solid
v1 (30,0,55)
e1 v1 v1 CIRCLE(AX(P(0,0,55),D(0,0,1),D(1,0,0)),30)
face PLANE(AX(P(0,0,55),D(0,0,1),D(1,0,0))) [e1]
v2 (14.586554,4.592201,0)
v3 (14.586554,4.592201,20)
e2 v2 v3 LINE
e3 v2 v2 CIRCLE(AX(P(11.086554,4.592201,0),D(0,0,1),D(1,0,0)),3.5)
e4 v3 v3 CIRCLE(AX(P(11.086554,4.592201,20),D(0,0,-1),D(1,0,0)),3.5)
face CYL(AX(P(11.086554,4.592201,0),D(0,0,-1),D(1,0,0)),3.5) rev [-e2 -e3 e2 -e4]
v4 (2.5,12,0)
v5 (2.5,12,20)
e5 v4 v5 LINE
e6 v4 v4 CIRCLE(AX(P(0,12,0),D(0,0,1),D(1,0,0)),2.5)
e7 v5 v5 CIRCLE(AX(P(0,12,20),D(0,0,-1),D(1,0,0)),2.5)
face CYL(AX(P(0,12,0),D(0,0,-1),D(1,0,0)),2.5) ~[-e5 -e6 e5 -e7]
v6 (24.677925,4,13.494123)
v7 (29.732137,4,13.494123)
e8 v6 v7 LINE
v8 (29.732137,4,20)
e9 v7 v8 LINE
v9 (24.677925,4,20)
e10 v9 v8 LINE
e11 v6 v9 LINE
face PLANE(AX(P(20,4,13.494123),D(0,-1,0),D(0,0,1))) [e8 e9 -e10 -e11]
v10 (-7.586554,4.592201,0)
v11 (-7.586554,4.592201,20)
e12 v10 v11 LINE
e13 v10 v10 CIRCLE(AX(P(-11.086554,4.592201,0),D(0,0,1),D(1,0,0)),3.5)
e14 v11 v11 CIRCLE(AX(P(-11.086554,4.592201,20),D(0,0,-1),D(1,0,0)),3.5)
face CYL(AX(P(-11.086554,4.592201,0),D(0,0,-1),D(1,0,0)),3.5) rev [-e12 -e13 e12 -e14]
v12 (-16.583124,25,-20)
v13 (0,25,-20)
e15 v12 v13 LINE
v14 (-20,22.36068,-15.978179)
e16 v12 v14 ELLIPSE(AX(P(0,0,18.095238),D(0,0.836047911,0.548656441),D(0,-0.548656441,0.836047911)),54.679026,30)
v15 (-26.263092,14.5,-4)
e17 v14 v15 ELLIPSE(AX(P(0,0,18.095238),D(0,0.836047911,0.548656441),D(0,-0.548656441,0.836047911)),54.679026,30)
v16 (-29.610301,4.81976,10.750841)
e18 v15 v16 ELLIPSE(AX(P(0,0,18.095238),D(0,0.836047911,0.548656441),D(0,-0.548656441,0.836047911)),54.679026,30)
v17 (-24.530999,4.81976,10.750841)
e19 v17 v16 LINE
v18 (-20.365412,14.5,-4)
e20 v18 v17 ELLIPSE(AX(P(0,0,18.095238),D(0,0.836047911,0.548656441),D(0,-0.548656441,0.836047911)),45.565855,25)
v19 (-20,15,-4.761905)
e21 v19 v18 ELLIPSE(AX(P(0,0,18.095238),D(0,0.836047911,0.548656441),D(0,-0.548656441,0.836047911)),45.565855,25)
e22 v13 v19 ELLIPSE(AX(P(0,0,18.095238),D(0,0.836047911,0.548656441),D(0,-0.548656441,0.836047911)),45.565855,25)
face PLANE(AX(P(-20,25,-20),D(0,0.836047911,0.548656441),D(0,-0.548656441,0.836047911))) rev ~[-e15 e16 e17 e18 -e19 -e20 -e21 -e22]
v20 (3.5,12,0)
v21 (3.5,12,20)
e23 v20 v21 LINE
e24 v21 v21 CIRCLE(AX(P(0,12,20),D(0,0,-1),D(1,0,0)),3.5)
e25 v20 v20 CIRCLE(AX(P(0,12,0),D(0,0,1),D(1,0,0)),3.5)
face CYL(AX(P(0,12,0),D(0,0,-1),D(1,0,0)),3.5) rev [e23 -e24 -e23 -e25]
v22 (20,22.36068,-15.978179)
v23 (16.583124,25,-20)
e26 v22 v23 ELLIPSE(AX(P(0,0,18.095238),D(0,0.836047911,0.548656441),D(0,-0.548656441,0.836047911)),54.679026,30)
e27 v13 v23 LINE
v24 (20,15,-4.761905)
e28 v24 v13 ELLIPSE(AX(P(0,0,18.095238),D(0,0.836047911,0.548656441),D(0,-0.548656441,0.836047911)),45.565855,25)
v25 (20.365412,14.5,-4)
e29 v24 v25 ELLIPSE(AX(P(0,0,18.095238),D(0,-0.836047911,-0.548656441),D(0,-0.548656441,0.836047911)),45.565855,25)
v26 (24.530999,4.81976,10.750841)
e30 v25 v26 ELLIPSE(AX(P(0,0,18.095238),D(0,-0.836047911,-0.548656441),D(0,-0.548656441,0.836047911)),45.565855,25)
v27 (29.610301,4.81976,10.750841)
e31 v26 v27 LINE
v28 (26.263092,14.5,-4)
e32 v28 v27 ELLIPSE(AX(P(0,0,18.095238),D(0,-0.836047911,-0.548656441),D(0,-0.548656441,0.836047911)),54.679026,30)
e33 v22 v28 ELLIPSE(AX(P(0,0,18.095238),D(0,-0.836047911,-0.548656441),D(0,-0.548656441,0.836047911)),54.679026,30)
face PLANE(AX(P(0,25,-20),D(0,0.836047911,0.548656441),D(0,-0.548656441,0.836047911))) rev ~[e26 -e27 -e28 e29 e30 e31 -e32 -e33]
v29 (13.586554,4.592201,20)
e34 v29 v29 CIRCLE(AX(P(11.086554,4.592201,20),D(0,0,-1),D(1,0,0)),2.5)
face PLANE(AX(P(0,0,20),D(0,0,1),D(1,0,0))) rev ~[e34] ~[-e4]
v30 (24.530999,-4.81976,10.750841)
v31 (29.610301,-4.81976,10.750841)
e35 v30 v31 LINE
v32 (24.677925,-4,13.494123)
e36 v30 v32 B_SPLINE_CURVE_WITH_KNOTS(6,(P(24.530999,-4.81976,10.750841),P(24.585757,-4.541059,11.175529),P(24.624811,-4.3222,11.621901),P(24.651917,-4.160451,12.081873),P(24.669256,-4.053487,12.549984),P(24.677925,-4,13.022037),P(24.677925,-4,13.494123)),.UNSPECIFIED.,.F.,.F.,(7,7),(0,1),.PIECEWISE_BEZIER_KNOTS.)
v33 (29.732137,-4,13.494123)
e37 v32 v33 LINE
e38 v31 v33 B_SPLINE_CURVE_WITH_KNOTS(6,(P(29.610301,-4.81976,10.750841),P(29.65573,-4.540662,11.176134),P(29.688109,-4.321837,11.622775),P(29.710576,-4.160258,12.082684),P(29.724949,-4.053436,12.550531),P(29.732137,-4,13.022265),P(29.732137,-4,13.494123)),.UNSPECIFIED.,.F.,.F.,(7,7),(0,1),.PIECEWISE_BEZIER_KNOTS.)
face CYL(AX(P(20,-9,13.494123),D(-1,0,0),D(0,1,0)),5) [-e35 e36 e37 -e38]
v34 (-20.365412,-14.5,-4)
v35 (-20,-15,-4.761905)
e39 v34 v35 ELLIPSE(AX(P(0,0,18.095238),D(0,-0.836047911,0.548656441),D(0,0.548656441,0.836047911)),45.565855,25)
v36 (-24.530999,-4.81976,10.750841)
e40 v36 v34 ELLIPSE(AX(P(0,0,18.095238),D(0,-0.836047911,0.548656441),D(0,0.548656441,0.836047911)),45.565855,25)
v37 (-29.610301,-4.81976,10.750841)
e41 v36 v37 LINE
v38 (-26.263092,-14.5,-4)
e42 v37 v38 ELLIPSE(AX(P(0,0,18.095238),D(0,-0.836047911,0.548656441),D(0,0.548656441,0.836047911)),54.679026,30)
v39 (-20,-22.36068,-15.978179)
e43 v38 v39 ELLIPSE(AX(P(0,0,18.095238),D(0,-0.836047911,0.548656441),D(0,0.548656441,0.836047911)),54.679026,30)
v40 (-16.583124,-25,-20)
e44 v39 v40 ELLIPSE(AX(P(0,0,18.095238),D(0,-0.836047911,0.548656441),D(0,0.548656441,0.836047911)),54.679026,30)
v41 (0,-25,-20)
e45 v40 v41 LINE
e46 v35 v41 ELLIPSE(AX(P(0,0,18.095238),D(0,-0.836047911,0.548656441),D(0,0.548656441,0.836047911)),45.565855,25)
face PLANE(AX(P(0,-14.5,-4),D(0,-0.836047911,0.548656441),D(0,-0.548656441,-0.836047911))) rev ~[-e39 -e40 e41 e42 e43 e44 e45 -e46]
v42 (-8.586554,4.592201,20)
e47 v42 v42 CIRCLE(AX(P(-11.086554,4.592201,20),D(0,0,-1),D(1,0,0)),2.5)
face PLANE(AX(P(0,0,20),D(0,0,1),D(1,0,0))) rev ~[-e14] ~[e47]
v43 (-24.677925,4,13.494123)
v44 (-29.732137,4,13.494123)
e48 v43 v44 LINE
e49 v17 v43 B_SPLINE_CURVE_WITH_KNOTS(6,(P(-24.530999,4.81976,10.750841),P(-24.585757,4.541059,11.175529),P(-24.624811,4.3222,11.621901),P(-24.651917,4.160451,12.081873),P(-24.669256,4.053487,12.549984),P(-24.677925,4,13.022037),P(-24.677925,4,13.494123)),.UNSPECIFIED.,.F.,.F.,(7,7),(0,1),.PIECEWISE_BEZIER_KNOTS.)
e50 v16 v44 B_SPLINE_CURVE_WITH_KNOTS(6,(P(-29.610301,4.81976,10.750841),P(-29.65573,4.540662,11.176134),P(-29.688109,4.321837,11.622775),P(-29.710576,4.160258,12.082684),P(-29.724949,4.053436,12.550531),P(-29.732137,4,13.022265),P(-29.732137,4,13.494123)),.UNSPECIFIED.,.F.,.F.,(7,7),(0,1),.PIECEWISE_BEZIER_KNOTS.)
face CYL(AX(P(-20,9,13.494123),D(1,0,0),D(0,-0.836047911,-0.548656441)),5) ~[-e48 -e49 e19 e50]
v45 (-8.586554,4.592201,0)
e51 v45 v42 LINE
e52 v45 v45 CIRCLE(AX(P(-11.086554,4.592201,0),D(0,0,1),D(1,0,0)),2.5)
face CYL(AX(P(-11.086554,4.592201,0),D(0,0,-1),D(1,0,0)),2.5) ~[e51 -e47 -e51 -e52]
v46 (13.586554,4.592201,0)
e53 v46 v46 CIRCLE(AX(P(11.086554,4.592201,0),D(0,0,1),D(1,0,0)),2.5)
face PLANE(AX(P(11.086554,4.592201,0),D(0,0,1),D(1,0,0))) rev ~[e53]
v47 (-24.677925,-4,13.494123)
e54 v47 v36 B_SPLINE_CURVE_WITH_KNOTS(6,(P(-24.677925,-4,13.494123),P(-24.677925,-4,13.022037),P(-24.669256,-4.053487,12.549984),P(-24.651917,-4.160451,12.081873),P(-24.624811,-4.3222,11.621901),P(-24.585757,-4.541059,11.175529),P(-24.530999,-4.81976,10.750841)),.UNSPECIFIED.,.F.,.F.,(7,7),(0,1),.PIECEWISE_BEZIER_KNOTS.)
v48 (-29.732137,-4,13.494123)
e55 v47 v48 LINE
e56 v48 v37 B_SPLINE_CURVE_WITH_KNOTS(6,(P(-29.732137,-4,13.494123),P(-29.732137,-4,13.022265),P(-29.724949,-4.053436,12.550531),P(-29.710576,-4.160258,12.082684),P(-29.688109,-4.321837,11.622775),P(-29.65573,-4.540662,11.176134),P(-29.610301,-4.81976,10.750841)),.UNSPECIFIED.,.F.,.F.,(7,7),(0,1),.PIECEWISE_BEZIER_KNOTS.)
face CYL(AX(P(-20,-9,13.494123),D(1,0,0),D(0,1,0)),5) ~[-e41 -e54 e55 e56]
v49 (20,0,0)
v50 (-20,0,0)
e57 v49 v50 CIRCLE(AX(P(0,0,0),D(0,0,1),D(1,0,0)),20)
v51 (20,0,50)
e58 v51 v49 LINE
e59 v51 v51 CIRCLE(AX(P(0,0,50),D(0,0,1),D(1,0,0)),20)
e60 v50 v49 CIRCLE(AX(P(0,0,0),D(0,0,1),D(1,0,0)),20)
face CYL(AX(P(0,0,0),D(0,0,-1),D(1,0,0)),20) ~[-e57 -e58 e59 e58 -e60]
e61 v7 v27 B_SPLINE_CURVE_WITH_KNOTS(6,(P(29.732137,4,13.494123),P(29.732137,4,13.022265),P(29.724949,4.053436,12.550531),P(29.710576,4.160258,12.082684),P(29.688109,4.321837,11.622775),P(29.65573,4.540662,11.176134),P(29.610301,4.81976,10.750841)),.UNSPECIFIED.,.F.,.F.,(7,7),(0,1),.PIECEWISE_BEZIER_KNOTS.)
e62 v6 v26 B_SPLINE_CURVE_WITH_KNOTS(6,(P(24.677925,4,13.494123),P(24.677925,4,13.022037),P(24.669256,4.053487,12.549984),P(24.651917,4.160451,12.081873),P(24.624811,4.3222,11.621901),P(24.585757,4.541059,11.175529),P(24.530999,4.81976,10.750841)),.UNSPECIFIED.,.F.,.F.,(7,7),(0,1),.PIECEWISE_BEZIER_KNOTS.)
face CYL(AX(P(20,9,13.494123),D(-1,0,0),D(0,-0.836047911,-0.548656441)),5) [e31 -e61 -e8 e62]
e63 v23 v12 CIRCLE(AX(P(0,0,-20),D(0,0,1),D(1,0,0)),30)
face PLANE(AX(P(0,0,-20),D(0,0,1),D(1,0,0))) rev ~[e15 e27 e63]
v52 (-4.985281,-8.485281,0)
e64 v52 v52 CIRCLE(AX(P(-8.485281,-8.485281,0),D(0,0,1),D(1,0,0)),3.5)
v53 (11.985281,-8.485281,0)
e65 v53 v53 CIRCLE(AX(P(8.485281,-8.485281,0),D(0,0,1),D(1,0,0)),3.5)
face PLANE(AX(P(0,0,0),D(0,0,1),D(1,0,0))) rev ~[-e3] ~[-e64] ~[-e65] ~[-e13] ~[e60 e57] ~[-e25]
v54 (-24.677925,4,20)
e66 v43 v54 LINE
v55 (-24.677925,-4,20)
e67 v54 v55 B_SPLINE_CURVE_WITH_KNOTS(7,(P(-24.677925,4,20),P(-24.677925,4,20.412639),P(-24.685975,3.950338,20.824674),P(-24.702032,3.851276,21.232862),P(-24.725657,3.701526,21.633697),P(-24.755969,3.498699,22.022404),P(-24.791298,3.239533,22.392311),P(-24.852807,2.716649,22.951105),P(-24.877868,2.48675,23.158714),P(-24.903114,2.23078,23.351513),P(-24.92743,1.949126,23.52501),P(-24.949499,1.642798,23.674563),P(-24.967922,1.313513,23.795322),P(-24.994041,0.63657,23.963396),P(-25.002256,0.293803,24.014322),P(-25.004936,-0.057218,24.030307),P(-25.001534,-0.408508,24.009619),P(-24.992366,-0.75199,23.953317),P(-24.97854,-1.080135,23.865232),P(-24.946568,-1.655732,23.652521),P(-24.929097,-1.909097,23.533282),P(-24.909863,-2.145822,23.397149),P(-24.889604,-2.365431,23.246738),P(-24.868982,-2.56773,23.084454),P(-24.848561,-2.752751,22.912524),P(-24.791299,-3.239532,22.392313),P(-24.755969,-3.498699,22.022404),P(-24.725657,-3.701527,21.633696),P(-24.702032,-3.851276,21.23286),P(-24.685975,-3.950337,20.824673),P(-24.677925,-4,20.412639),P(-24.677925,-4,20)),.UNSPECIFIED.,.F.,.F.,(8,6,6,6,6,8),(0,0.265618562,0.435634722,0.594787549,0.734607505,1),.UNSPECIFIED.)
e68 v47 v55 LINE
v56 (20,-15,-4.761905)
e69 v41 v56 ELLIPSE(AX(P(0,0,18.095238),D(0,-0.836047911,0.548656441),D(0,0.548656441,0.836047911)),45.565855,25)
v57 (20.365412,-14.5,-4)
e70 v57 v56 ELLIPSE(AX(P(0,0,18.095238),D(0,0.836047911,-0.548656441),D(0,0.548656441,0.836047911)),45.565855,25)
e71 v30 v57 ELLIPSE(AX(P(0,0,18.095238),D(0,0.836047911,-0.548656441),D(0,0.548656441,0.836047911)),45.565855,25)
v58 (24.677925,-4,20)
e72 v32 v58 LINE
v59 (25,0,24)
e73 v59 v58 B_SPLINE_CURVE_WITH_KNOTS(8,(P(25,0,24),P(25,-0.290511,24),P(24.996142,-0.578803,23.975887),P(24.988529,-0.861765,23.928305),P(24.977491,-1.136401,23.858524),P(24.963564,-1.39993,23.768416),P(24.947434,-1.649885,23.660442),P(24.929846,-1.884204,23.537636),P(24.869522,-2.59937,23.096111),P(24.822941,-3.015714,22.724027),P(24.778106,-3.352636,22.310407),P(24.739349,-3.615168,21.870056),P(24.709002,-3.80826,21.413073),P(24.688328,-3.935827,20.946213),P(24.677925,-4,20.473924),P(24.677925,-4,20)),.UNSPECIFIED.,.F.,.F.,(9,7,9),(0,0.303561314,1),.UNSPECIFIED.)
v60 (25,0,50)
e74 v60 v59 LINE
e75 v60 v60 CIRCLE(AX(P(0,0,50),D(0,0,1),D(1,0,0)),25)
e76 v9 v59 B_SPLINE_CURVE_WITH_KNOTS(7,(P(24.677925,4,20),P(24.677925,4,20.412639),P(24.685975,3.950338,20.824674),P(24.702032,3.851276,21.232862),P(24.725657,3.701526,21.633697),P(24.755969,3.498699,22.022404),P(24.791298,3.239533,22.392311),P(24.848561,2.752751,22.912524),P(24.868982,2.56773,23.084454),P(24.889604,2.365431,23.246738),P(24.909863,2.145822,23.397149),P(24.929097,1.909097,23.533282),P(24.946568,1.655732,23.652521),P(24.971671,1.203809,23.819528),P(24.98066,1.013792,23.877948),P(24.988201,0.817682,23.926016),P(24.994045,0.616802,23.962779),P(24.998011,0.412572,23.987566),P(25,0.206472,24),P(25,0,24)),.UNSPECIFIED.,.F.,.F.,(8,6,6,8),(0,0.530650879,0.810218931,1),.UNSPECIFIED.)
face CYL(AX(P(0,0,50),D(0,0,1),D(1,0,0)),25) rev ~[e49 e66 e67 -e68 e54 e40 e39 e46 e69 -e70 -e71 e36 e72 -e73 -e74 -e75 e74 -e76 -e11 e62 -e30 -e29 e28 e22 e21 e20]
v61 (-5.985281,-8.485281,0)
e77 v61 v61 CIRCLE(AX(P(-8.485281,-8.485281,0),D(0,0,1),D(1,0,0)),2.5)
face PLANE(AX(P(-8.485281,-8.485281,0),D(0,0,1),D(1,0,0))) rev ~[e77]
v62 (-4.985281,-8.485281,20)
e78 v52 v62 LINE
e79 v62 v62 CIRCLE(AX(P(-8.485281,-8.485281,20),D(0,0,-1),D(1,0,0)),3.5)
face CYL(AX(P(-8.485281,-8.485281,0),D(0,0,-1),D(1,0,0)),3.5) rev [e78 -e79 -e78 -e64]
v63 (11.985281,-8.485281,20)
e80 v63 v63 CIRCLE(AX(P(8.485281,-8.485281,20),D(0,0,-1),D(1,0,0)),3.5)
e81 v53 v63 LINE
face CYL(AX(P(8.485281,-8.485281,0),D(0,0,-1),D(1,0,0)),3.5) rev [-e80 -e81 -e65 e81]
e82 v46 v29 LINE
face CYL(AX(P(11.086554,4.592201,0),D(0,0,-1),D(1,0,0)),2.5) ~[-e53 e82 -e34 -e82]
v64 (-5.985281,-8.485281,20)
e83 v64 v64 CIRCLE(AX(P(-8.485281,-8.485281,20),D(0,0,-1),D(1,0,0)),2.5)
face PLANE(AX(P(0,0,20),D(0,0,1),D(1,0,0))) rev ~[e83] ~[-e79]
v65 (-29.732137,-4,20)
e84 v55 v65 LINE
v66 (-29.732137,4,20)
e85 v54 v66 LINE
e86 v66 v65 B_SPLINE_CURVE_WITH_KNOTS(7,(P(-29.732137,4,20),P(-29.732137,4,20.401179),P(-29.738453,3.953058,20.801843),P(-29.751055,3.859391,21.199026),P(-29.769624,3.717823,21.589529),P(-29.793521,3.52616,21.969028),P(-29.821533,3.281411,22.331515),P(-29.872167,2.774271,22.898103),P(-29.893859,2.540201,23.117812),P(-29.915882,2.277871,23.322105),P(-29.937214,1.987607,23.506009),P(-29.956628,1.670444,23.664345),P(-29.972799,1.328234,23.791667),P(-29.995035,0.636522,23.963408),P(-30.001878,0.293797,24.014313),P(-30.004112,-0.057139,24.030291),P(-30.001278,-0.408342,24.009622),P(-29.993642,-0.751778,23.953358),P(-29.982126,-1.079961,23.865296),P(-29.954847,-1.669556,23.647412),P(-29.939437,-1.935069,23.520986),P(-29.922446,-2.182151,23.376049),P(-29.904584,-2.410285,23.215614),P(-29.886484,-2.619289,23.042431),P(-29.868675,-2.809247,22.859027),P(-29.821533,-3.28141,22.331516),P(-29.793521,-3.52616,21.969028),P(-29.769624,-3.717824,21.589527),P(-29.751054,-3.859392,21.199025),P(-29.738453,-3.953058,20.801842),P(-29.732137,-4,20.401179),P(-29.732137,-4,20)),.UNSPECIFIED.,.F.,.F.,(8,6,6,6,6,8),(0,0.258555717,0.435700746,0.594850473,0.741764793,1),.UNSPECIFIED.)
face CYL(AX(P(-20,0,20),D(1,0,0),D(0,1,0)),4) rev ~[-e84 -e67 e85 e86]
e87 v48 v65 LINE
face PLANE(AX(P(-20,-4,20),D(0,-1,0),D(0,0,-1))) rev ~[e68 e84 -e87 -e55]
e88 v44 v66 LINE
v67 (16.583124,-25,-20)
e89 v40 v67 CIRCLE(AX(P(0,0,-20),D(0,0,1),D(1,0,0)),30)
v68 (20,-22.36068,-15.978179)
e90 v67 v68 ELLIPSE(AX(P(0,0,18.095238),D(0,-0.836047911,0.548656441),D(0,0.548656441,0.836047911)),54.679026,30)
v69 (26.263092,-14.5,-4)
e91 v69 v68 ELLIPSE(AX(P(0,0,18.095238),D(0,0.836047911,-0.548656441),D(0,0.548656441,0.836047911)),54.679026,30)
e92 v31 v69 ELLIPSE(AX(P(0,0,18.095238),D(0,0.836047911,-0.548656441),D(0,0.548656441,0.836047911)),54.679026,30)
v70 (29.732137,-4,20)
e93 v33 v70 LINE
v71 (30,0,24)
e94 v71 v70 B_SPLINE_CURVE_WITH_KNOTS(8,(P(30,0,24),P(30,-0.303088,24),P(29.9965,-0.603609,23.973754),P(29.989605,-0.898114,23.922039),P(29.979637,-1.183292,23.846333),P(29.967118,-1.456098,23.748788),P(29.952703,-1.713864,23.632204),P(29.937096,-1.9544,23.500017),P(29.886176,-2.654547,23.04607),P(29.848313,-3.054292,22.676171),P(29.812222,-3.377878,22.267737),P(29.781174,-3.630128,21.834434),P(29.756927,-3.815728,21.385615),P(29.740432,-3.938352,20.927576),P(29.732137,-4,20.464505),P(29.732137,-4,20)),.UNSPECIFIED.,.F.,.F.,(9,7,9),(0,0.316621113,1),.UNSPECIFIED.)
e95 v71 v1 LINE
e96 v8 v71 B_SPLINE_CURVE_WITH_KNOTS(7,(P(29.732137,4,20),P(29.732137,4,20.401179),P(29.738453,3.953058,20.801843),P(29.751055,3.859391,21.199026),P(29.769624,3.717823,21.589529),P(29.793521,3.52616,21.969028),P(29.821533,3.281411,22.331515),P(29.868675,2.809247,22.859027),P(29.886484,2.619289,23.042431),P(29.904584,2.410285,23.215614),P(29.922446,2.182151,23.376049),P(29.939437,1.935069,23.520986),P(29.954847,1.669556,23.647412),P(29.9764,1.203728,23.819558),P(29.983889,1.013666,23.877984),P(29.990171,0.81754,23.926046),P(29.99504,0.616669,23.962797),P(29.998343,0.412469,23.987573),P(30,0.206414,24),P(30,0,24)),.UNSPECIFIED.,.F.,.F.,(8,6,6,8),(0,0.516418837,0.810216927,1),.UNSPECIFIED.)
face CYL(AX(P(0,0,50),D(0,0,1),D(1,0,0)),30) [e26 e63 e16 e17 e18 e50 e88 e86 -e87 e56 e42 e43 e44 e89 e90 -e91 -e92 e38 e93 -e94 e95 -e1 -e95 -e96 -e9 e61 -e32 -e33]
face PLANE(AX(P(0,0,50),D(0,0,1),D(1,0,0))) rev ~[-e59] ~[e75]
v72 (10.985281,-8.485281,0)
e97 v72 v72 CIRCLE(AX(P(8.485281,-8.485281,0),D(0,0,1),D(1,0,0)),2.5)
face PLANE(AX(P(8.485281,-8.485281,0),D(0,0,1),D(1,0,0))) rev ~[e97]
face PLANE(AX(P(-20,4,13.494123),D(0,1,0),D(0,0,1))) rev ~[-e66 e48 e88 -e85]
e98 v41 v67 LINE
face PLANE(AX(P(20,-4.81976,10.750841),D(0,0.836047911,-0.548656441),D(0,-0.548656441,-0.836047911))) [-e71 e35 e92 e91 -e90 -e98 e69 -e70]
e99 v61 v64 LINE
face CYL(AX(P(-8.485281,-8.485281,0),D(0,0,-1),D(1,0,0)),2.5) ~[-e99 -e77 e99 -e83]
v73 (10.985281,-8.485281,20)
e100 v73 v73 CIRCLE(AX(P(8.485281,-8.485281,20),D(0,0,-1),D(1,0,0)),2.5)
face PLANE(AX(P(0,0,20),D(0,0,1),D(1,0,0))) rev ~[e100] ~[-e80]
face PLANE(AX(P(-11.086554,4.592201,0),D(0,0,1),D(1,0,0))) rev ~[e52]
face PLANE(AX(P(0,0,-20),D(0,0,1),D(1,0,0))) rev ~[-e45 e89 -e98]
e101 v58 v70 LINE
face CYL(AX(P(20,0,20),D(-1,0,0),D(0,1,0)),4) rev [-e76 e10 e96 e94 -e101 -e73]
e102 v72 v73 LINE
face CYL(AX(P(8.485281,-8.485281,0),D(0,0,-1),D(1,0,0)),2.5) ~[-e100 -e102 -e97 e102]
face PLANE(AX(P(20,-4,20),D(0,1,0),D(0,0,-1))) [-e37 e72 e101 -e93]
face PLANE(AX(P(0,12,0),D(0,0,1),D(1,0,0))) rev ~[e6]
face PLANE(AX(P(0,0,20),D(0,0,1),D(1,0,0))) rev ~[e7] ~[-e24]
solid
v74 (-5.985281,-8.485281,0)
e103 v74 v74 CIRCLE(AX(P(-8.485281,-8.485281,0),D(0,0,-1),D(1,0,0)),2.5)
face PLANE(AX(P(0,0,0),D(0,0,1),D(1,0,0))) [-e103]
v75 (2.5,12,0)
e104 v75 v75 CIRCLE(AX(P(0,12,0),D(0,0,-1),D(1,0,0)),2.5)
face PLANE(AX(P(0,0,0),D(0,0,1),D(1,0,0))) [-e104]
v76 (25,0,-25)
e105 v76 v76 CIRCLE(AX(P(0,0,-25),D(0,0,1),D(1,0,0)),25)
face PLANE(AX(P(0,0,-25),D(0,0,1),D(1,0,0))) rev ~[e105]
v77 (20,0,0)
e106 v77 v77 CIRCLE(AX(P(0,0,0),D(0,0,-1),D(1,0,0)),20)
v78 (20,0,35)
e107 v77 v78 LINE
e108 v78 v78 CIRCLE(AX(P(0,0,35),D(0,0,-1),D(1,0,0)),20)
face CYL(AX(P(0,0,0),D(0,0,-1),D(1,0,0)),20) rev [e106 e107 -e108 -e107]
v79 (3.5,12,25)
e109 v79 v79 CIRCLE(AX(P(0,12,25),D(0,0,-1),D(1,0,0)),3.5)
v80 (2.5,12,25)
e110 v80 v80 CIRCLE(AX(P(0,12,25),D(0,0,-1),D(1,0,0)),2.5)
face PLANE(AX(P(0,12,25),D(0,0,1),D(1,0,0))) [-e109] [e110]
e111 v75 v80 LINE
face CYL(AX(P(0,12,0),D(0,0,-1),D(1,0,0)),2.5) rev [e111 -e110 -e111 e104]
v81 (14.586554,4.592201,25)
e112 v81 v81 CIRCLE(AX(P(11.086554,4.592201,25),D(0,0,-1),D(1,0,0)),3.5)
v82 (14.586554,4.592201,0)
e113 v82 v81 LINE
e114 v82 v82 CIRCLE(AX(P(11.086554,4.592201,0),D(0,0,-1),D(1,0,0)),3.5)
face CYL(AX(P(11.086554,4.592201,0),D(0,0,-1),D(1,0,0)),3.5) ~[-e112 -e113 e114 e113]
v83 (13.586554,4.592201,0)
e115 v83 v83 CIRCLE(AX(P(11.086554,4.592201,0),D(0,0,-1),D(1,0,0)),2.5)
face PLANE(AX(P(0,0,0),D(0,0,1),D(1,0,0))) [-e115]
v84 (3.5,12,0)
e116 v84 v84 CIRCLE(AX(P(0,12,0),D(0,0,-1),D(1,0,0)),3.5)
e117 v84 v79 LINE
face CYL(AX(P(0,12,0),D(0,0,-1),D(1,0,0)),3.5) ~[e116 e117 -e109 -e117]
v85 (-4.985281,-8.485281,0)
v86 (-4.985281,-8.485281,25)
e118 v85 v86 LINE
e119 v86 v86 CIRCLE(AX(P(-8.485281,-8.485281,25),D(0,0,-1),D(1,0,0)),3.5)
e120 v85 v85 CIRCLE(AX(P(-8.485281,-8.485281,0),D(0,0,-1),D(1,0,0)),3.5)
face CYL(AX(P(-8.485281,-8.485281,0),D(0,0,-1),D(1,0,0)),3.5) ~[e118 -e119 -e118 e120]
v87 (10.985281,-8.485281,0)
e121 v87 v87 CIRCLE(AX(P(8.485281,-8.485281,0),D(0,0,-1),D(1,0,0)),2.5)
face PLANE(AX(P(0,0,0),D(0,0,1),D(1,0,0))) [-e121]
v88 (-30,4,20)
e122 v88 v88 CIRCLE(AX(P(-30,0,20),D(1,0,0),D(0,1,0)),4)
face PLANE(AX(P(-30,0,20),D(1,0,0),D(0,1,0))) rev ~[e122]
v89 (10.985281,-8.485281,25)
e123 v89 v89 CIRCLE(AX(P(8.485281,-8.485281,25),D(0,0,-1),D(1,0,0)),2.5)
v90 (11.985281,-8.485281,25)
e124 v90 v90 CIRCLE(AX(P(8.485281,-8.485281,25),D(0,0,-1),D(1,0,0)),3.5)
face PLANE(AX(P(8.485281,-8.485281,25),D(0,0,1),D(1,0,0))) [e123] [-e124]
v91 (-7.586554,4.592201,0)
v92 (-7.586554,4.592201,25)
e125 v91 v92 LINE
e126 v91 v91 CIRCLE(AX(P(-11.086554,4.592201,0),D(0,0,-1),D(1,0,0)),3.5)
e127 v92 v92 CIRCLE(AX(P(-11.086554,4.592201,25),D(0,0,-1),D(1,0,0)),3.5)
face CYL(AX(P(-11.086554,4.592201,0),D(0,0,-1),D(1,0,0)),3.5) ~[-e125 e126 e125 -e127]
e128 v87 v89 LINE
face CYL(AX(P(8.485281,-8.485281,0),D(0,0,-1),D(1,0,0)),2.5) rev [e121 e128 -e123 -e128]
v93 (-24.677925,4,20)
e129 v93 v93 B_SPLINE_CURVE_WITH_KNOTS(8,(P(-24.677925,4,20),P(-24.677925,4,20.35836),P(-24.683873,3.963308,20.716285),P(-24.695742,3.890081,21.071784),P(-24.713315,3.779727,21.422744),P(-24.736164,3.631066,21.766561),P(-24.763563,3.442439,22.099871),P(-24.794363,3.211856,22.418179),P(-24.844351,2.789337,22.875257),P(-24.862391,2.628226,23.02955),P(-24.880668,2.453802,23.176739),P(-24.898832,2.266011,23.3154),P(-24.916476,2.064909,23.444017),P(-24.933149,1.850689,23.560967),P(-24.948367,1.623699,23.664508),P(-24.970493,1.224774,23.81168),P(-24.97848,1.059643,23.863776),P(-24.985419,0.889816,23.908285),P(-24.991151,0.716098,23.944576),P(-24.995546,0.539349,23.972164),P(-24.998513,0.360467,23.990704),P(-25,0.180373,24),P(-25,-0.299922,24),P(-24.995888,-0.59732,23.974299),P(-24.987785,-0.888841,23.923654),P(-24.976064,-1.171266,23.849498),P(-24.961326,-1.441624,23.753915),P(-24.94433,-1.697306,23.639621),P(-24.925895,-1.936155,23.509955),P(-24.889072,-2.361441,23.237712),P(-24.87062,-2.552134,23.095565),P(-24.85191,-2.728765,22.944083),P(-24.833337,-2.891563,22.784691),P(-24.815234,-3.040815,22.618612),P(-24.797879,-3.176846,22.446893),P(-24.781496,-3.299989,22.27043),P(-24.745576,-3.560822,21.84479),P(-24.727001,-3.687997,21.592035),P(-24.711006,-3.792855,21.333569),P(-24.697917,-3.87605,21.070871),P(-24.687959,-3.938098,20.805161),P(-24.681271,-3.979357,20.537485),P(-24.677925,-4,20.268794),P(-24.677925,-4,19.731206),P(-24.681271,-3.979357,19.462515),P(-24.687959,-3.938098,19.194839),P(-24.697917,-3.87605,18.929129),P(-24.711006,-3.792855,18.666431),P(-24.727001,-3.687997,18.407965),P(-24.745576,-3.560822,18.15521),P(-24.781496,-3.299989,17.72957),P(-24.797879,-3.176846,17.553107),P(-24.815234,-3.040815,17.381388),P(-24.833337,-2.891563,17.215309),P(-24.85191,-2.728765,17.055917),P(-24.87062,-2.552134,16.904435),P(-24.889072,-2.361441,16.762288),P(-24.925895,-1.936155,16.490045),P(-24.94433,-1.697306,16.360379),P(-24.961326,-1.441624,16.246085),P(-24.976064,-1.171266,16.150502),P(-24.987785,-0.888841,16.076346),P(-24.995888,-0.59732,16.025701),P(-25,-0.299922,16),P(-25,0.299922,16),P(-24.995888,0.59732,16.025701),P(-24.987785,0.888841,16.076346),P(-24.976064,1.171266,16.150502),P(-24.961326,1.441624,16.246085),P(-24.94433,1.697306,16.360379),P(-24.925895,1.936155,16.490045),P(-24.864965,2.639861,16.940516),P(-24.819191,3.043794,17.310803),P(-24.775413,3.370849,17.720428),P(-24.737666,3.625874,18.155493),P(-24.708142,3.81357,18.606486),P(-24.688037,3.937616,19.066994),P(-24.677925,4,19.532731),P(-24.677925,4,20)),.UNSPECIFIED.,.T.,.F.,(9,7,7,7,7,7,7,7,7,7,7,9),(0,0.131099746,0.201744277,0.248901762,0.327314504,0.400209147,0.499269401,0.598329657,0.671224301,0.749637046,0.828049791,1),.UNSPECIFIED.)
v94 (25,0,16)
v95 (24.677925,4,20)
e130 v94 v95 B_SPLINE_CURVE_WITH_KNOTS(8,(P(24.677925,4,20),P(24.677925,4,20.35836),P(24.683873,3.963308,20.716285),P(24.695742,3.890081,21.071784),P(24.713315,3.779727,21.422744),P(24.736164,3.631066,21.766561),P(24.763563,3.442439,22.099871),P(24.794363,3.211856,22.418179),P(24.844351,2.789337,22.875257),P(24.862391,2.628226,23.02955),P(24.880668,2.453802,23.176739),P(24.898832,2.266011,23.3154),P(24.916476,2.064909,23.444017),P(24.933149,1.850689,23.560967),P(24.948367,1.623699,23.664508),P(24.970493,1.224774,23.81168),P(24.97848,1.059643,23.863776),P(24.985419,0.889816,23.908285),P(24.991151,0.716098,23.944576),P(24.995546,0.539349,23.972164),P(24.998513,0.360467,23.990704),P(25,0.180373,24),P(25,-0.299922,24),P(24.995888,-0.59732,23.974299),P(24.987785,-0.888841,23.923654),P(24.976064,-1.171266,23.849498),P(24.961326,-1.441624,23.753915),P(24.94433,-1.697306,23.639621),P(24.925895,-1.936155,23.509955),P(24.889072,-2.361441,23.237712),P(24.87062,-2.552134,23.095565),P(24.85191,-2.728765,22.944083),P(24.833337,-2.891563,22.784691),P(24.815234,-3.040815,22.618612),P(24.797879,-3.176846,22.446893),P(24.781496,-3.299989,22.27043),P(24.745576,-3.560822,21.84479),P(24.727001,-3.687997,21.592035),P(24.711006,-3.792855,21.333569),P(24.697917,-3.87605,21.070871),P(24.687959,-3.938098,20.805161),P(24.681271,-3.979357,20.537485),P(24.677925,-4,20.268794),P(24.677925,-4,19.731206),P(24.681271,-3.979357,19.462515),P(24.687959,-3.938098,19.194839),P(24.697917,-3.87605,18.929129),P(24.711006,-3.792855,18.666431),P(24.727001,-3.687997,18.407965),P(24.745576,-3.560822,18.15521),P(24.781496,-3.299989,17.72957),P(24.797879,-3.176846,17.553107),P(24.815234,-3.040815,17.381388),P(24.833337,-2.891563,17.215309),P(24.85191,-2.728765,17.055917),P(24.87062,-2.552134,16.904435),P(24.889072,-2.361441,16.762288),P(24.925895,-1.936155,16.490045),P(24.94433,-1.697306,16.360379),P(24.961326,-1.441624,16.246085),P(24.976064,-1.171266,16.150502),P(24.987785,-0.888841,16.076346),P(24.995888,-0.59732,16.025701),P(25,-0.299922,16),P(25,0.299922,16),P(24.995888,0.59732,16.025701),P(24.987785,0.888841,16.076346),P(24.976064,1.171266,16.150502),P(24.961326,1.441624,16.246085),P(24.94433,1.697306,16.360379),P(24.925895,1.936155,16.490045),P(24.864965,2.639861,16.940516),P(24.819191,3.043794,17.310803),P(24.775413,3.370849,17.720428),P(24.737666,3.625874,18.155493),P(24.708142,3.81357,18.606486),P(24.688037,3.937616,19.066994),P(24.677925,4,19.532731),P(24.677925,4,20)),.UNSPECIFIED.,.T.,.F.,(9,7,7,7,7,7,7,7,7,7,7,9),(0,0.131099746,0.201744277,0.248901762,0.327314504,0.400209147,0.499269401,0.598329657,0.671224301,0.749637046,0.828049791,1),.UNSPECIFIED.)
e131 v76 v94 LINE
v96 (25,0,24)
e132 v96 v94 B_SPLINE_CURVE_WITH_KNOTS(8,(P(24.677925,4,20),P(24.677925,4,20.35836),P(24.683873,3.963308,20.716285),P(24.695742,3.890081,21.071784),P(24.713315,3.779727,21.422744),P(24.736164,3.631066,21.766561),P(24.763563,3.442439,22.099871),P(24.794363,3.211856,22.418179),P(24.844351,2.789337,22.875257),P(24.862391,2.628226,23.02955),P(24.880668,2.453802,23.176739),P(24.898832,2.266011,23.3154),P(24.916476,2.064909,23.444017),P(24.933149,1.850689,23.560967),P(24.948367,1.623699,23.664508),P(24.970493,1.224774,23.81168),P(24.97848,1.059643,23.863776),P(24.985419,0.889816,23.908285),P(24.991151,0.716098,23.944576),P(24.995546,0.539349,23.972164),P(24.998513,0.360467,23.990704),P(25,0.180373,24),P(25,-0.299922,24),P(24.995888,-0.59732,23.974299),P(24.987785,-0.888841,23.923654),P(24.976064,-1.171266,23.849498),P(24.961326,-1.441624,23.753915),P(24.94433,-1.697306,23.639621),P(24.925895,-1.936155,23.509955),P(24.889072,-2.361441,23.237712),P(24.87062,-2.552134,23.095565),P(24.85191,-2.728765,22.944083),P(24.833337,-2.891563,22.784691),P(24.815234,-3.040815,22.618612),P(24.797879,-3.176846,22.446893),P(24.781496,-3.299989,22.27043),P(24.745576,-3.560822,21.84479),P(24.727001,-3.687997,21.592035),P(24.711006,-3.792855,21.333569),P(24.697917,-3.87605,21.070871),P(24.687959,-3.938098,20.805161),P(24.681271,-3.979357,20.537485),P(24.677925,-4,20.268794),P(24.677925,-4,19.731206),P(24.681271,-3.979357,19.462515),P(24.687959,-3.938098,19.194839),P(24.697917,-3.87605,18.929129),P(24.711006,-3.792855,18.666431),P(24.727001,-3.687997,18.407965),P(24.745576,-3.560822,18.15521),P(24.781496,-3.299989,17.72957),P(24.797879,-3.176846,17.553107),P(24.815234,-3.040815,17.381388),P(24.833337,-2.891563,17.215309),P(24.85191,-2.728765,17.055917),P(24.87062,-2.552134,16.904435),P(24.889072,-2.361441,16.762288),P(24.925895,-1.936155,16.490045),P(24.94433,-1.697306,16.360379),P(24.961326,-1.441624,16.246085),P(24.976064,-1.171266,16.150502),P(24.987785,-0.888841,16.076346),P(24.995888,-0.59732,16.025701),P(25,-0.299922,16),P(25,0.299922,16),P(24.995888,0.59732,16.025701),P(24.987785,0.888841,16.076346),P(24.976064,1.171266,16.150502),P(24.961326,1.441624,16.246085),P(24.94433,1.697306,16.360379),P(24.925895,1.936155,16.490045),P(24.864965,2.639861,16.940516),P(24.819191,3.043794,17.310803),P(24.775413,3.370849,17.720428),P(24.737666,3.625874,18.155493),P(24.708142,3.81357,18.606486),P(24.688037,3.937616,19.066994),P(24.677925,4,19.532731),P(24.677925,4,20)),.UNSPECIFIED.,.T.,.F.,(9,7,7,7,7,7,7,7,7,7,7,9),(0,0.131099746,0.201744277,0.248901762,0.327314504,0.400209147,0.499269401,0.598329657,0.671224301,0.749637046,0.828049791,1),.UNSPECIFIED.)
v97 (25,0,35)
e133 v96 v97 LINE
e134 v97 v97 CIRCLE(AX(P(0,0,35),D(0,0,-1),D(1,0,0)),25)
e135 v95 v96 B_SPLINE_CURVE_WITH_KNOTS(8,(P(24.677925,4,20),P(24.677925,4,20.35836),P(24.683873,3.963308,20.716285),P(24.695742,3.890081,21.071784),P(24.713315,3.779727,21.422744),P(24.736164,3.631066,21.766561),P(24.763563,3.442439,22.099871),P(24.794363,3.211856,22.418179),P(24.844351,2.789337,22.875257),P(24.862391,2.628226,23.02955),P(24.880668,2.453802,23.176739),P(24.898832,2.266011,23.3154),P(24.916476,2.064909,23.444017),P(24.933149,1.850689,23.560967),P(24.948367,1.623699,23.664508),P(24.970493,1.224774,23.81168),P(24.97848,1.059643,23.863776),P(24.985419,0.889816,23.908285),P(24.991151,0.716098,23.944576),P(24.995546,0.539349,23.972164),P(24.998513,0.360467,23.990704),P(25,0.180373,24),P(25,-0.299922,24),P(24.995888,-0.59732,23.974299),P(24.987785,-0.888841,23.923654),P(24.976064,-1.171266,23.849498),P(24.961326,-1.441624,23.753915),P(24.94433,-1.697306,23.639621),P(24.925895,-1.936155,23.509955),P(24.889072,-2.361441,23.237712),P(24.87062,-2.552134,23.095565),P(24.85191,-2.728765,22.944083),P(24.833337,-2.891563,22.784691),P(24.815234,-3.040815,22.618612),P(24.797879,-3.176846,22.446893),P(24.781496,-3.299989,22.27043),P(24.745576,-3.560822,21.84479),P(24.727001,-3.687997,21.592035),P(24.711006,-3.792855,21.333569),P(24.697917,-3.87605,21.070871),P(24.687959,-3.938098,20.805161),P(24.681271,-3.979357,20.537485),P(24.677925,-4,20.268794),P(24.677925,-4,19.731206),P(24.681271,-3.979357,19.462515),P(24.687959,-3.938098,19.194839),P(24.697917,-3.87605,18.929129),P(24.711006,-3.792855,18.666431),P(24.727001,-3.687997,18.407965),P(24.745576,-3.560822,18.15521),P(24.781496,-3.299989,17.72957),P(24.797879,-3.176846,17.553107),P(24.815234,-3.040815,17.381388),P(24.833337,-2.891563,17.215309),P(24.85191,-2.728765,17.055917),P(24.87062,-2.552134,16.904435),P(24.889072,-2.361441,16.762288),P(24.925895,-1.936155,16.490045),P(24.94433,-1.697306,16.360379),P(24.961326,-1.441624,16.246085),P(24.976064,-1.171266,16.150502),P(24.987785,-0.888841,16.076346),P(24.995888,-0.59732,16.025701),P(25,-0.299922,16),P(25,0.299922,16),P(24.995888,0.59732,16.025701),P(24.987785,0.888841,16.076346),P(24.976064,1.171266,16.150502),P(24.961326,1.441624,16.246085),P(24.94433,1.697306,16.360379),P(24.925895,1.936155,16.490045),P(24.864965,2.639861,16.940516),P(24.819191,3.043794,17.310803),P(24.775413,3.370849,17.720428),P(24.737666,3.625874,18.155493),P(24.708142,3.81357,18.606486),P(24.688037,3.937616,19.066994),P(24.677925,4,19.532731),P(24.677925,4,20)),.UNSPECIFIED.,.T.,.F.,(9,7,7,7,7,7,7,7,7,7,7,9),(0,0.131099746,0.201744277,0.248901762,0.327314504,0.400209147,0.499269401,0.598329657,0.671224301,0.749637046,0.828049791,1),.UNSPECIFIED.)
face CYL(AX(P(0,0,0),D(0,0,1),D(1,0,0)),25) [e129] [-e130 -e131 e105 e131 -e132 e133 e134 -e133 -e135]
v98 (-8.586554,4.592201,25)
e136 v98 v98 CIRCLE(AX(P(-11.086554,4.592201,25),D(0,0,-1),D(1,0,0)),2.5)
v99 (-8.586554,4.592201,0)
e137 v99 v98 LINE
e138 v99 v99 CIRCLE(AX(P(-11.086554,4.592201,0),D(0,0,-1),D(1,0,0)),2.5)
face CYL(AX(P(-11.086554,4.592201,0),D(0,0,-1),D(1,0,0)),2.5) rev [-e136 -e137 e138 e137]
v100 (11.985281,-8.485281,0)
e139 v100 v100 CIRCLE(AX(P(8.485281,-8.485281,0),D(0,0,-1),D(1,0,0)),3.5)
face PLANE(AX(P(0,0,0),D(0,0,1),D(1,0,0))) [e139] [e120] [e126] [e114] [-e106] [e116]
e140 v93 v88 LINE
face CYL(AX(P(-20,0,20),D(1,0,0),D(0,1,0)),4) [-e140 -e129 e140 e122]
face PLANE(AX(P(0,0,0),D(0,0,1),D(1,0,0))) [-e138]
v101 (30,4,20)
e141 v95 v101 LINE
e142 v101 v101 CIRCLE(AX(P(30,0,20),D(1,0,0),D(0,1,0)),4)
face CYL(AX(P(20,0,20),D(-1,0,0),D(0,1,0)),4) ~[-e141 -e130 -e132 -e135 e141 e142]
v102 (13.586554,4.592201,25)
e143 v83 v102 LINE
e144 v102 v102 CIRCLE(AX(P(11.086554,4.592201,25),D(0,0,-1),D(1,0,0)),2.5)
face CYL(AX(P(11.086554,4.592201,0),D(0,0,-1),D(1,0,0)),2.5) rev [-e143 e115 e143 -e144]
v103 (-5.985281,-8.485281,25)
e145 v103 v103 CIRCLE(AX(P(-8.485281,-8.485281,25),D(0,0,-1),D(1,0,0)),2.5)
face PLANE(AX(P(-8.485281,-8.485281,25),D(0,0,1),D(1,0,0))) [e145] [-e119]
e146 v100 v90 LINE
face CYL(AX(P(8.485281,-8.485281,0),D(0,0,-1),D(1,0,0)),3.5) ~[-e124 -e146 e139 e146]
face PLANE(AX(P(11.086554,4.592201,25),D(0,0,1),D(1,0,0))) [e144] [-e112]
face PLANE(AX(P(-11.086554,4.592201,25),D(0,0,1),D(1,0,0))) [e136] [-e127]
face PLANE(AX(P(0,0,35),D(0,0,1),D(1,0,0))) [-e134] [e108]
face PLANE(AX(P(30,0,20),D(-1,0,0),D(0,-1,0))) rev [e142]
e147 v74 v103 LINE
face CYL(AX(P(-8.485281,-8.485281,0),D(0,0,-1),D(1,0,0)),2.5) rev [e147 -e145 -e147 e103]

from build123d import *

# Parameters (mm, degrees)
F0_R      = 25
F0_R_2    = 20
F1_DEPTH  = 35
F0_R_3    = 3.5
F0_R_4    = 2.5
F2_DEPTH  = 25
F3_DEPTH  = 25
F5_R      = 4
F6_DEPTH  = 10
F8_R      = 20
F8_R_2    = 3.5
F9_DEPTH  = 30
F10_R     = 20
F11_DEPTH = 15
F12_R     = 30
F12_R_2   = 25
F12_R_3   = 20
F13_DEPTH = 5
F14_DEPTH = 70
F16_DEPTH = 100
F19_DEPTH = 25
F21_DEPTH = 30


with BuildPart() as f1:
    # F0 (on Top) → F1 (new body)
    with BuildSketch(Plane.XY):
        Circle(F0_R)
        Circle(F0_R_2, mode=Mode.SUBTRACT)
    extrude(amount=F1_DEPTH)

    # F0 (on Top) → F2 (join)
    with BuildSketch(Plane.XY):
        Circle(F0_R)
        Circle(F0_R_2, mode=Mode.SUBTRACT)
        Circle(F0_R_2)
        with Locations((-8.4852813742, -8.4852813742)):
            Circle(F0_R_3, mode=Mode.SUBTRACT)
        with Locations((8.4852813742, -8.4852813742)):
            Circle(F0_R_3, mode=Mode.SUBTRACT)
        with Locations((-11.0865543901, 4.5922011884)):
            Circle(F0_R_3, mode=Mode.SUBTRACT)
        with Locations((11.0865543901, 4.5922011884)):
            Circle(F0_R_3, mode=Mode.SUBTRACT)
        with Locations((0, 12)):
            Circle(F0_R_3, mode=Mode.SUBTRACT)
        with Locations((-8.4852813742, -8.4852813742)):
            Circle(F0_R_3)
        with Locations((-8.4852813742, -8.4852813742)):
            Circle(F0_R_4, mode=Mode.SUBTRACT)
        with Locations((11.0865543901, 4.5922011884)):
            Circle(F0_R_3)
        with Locations((11.0865543901, 4.5922011884)):
            Circle(F0_R_4, mode=Mode.SUBTRACT)
        with Locations((8.4852813742, -8.4852813742)):
            Circle(F0_R_3)
        with Locations((8.4852813742, -8.4852813742)):
            Circle(F0_R_4, mode=Mode.SUBTRACT)
        with Locations((-11.0865543901, 4.5922011884)):
            Circle(F0_R_3)
        with Locations((-11.0865543901, 4.5922011884)):
            Circle(F0_R_4, mode=Mode.SUBTRACT)
        with Locations((0, 12)):
            Circle(F0_R_3)
        with Locations((0, 12)):
            Circle(F0_R_4, mode=Mode.SUBTRACT)
        with Locations((-8.4852813742, -8.4852813742)):
            Circle(F0_R_4)
        with Locations((-11.0865543901, 4.5922011884)):
            Circle(F0_R_4)
        with Locations((0, 12)):
            Circle(F0_R_4)
        with Locations((11.0865543901, 4.5922011884)):
            Circle(F0_R_4)
        with Locations((8.4852813742, -8.4852813742)):
            Circle(F0_R_4)
    extrude(amount=-F2_DEPTH)

    # F0 (on Top) → F3 (join)
    with BuildSketch(Plane.XY):
        with Locations((0, 12)):
            Circle(F0_R_3)
        with Locations((0, 12)):
            Circle(F0_R_4, mode=Mode.SUBTRACT)
        with Locations((-11.0865543901, 4.5922011884)):
            Circle(F0_R_3)
        with Locations((-11.0865543901, 4.5922011884)):
            Circle(F0_R_4, mode=Mode.SUBTRACT)
        with Locations((11.0865543901, 4.5922011884)):
            Circle(F0_R_3)
        with Locations((11.0865543901, 4.5922011884)):
            Circle(F0_R_4, mode=Mode.SUBTRACT)
        with Locations((8.4852813742, -8.4852813742)):
            Circle(F0_R_3)
        with Locations((8.4852813742, -8.4852813742)):
            Circle(F0_R_4, mode=Mode.SUBTRACT)
        with Locations((-8.4852813742, -8.4852813742)):
            Circle(F0_R_3)
        with Locations((-8.4852813742, -8.4852813742)):
            Circle(F0_R_4, mode=Mode.SUBTRACT)
    extrude(amount=F3_DEPTH)

    # F5 (on offset) → F6 (join)
    with BuildSketch(Plane.YZ.offset(-20)):
        with Locations((0, 20)):
            Circle(F5_R)
    extrude(amount=-F6_DEPTH)

    # F7: F1 across plane


with BuildPart() as f1_1:
    add(f1.part)
    add(f1.part.mirror(Plane.YZ))


with BuildPart() as f9:
    # F8 (on Top) → F9 (new body)
    with BuildSketch(Plane.XY):
        Circle(F8_R)
        with Locations((-8.4852813742, -8.4852813742)):
            Circle(F8_R_2, mode=Mode.SUBTRACT)
        with Locations((8.4852813742, -8.4852813742)):
            Circle(F8_R_2, mode=Mode.SUBTRACT)
        with Locations((-11.0865543901, 4.5922011884)):
            Circle(F8_R_2, mode=Mode.SUBTRACT)
        with Locations((11.0865543901, 4.5922011884)):
            Circle(F8_R_2, mode=Mode.SUBTRACT)
        with Locations((0, 12)):
            Circle(F8_R_2, mode=Mode.SUBTRACT)
    extrude(amount=F9_DEPTH)



with BuildPart() as f9b:
    # F0 (on Top) → F9, piece 2 (new body)
    with BuildSketch(Plane.XY):
        with Locations((0, 12)):
            Circle(F0_R_4)
    extrude(amount=F9_DEPTH)


with BuildPart() as f9c:
    # F0 (on Top) → F9, piece 3 (new body)
    with BuildSketch(Plane.XY):
        with Locations((-11.0865543901, 4.5922011884)):
            Circle(F0_R_4)
    extrude(amount=F9_DEPTH)


with BuildPart() as f9d:
    # F0 (on Top) → F9, piece 4 (new body)
    with BuildSketch(Plane.XY):
        with Locations((-8.4852813742, -8.4852813742)):
            Circle(F0_R_4)
    extrude(amount=F9_DEPTH)


with BuildPart() as f9e:
    # F0 (on Top) → F9, piece 5 (new body)
    with BuildSketch(Plane.XY):
        with Locations((8.4852813742, -8.4852813742)):
            Circle(F0_R_4)
    extrude(amount=F9_DEPTH)


with BuildPart() as f9f:
    # F0 (on Top) → F9, piece 6 (new body)
    with BuildSketch(Plane.XY):
        with Locations((11.0865543901, 4.5922011884)):
            Circle(F0_R_4)
    extrude(amount=F9_DEPTH)


with BuildPart() as f9_1:
    add(f9.part)

    add(f9b.part)  # F11 merges F9b

    add(f9c.part)  # F11 merges F9c

    add(f9d.part)  # F11 merges F9d

    add(f9e.part)  # F11 merges F9e

    add(f9f.part)  # F11 merges F9f
    # F10 (on face) → F11 (join, symmetric)
    with BuildSketch(Plane.XY.offset(35)):
        Circle(F10_R)
    extrude(amount=F11_DEPTH, both=True)

    # F12 (on face) → F13 (join)
    with BuildSketch(Plane.XY.offset(50)):
        Circle(F12_R)
        Circle(F12_R_2, mode=Mode.SUBTRACT)
        Circle(F12_R_2)
        Circle(F12_R_3, mode=Mode.SUBTRACT)
        Circle(F12_R_3)
    extrude(amount=F13_DEPTH)

    # F12 (on face) → F14 (join)
    with BuildSketch(Plane.XY.offset(50)):
        Circle(F12_R)
        Circle(F12_R_2, mode=Mode.SUBTRACT)
    extrude(amount=-F14_DEPTH)

    # F15 (on offset) → F16 (cut)
    with BuildSketch(Plane.YZ.offset(-20)):
        with BuildLine():
            Line((4, 13.4941234329), (4, 20))
            ThreePointArc((4, 20), (0, 24), (-4, 20))
            Line((-4, 20), (-4, 13.4941234329))
            ThreePointArc((-4, 13.4941234329), (-4.2093216675, 12.0625504817), (-4.8197604458, 10.7508412254))
            Line((-4.8197604458, 10.7508412254), (-25, -20))
            Line((-25, -20), (25, -20))
            Line((25, -20), (4.8197604458, 10.7508412254))
            ThreePointArc((4.8197604458, 10.7508412254), (4.2093216675, 12.0625504817), (4, 13.4941234329))
        make_face()
    extrude(amount=-F16_DEPTH, mode=Mode.SUBTRACT)

    # F18 (on offset) → F19 (cut)
    with BuildSketch(Plane.YZ.offset(20)):
        with BuildLine():
            Line((4, 13.4941234329), (4, 20))
            ThreePointArc((4, 20), (0, 24), (-4, 20))
            Line((-4, 20), (-4, 13.4941234329))
            ThreePointArc((-4, 13.4941234329), (-4.2093216675, 12.0625504817), (-4.8197604458, 10.7508412254))
            Line((-4.8197604458, 10.7508412254), (-25, -20))
            Line((-25, -20), (25, -20))
            Line((25, -20), (4.8197604458, 10.7508412254))
            ThreePointArc((4.8197604458, 10.7508412254), (4.2093216675, 12.0625504817), (4, 13.4941234329))
        make_face()
    extrude(amount=F19_DEPTH, mode=Mode.SUBTRACT)

    # F20 (on Right) → F21 (cut, symmetric)
    with BuildSketch(Plane.YZ):
        Polygon((-14.5, -4), (-25, -20), (25, -20), (14.5, -4), align=None)
    extrude(amount=F21_DEPTH, both=True, mode=Mode.SUBTRACT)


solid = Compound([f1_1.part, f9_1.part])
